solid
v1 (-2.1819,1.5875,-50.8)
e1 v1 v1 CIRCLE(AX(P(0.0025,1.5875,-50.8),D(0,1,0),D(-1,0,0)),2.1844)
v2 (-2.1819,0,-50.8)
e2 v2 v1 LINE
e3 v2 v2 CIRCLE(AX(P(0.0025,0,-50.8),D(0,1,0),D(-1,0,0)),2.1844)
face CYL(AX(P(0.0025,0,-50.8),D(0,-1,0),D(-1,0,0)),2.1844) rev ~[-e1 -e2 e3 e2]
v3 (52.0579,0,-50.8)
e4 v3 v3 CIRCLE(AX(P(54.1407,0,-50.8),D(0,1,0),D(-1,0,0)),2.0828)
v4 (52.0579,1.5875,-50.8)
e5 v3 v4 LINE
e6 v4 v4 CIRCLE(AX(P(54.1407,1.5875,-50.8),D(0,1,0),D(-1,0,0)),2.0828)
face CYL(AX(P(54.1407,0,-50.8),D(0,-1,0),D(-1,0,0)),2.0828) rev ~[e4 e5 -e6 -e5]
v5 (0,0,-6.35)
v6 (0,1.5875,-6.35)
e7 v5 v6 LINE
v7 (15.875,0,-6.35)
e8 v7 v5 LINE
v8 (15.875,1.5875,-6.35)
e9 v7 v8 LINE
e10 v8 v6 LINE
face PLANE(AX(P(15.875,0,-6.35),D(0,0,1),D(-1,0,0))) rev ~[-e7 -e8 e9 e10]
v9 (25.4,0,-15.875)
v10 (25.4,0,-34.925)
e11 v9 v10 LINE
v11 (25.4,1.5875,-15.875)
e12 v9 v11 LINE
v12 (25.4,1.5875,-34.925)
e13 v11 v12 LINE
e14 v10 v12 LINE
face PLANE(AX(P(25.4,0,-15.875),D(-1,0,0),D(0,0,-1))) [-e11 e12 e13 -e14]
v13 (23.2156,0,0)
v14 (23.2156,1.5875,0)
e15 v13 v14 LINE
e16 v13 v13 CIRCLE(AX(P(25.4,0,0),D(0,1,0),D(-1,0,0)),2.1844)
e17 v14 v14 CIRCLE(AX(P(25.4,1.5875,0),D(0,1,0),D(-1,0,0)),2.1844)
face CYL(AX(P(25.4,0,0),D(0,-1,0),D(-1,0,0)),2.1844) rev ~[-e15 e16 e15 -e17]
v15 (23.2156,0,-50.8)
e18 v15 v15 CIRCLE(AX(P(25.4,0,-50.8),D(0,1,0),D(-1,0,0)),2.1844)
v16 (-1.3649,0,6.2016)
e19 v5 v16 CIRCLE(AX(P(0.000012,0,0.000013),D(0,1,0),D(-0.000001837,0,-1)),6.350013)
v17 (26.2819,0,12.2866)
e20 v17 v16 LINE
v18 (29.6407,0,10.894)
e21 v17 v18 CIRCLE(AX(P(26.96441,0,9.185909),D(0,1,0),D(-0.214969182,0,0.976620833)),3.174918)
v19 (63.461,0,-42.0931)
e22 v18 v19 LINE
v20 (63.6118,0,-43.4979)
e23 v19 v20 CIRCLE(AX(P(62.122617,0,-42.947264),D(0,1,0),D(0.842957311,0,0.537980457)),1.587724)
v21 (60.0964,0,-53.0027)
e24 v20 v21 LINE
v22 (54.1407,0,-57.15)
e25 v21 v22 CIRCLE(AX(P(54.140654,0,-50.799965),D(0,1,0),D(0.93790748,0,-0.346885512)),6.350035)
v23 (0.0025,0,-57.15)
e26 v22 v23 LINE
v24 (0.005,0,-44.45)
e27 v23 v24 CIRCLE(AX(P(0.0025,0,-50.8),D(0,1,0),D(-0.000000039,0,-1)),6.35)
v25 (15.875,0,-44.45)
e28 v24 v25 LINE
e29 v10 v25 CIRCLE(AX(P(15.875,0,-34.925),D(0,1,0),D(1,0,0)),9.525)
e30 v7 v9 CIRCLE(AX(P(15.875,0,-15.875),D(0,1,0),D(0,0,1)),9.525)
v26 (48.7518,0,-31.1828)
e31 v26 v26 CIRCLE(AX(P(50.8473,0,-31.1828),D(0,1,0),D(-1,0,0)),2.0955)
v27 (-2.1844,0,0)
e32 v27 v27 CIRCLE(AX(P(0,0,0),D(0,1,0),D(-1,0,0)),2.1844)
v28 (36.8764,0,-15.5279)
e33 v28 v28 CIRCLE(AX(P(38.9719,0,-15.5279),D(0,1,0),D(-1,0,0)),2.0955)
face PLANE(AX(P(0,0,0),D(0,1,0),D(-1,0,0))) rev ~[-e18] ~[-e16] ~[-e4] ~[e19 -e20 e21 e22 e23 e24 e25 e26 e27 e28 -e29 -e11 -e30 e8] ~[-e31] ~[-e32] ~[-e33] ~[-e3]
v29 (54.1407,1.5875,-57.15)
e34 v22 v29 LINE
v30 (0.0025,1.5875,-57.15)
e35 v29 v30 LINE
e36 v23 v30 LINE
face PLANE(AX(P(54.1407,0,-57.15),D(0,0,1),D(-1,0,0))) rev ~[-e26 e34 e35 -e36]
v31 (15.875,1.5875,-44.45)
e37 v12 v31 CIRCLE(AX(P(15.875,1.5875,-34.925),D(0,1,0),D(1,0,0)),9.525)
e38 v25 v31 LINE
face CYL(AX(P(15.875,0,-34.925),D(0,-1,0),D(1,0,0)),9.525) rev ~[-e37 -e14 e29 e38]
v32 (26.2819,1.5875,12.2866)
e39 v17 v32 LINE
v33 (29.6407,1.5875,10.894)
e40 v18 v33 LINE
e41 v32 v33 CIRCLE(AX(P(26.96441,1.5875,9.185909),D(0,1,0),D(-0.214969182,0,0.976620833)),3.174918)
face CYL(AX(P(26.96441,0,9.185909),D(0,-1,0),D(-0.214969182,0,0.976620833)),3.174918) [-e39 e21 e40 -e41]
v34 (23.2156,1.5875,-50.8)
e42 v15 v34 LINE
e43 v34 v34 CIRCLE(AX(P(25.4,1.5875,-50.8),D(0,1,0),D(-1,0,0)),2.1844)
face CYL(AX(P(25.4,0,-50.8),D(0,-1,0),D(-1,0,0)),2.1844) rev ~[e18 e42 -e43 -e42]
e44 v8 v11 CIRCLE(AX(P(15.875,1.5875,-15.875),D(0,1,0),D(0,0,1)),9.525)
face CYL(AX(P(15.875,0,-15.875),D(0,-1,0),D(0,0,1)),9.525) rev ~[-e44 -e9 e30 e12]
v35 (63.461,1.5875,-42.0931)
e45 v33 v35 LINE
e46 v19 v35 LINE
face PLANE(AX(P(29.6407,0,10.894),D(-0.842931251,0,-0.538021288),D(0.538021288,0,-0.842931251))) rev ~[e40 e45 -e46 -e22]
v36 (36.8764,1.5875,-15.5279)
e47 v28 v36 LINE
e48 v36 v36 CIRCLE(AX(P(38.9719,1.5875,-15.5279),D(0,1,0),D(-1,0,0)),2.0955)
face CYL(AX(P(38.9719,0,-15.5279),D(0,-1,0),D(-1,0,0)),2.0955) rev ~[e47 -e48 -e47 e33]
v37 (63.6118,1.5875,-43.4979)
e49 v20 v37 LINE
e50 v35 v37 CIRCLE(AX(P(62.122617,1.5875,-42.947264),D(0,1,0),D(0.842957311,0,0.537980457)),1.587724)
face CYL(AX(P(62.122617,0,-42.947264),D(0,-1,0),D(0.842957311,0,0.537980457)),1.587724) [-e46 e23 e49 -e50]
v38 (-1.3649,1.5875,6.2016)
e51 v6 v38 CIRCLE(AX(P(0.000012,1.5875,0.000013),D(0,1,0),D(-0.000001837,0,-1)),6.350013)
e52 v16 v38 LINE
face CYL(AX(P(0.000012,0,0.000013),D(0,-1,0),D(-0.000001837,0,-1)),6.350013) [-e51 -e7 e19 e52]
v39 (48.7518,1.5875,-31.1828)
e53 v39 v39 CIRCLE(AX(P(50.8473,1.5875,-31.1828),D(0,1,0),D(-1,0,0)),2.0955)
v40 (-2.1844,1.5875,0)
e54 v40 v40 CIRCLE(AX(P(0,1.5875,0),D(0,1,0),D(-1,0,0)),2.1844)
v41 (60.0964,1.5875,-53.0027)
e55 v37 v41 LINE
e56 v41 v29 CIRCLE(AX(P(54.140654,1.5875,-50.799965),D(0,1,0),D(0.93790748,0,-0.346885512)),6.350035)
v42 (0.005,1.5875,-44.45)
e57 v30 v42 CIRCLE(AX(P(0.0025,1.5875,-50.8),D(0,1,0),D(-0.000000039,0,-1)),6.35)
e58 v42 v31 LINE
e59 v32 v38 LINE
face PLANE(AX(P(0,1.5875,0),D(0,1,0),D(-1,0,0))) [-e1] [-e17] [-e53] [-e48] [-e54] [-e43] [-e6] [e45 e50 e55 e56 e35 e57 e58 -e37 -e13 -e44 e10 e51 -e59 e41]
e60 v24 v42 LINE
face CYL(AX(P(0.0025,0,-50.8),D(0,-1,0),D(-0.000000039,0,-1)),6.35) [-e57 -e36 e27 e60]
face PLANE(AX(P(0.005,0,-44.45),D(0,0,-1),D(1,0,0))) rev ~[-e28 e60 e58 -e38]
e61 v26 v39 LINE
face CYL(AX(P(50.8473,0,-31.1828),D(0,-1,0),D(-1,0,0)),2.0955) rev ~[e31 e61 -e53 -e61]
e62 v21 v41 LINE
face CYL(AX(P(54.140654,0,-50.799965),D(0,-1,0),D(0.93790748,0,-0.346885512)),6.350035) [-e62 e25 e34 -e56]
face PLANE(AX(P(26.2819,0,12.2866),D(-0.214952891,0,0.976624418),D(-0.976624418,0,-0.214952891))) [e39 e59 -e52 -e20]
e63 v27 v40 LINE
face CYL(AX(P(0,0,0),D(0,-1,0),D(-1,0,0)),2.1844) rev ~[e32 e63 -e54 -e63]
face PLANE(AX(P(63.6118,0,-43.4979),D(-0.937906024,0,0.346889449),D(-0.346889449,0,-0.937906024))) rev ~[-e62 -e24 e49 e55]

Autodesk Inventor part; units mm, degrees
ref_plane "YZ Plane" through (0, 0, 0) normal (1, 0, 0) x (0, 1, 0)
ref_plane "XZ Plane" through (0, 0, 0) normal (0, 1, 0) x (-1, 0, 0)
ref_plane "XY Plane" through (0, 0, 0) normal (0, 0, 1) x (1, 0, 0)
sketch "main" plane through (0, 0, 0) normal (0, 0, 1) x (1, 0, 0)
  circle A0 centre (-18.8876, -16.6215) radius 2.0828
  arc A1 (-24.8433, -18.8241) -> (-18.8876, -22.9715) centre (-18.8876, -16.6215) ccw
  line L0 (5.6124, 45.0726) -> (-28.2078, -7.9145)
  circle A2 centre (9.8531, -16.6215) radius 2.1844
  line L1 (-18.8876, -22.9715) -> (35.2506, -22.9715)
  line L2 (9.8531, 18.3035) -> (9.8531, -0.7465)
  arc A3 (9.8531, -0.7465) -> (19.3781, -10.2715) centre (19.3781, -0.7465) ccw
  circle A4 centre (9.8531, 34.1785) radius 2.1844
  line L3 (35.2481, -10.2715) -> (19.3781, -10.2715)
  arc A5 (35.2506, -22.9715) -> (35.2481, -10.2715) centre (35.2506, -16.6215) ccw
  circle A6 centre (35.2531, 34.1785) radius 2.1844
  arc A7 (35.2531, 27.8285) -> (36.6181, 40.3801) centre (35.2531, 34.1785) ccw
  circle A8 centre (35.2506, -16.6215) radius 2.1844
  line L4 (-28.3586, -9.3193) -> (-24.8433, -18.8241)
  line L5 (19.3781, 27.8285) -> (35.2531, 27.8285)
  arc A9 (19.3781, 27.8285) -> (9.8531, 18.3035) centre (19.3781, 18.3035) ccw
  arc A10 (-28.2078, -7.9145) -> (-28.3586, -9.3193) centre (-26.8697, -8.7686) ccw
  line L6 (8.9712, 46.4651) -> (36.6181, 40.3801)
  arc A11 (8.9712, 46.4651) -> (5.6124, 45.0726) centre (8.2887, 43.3643) ccw
  circle A12 centre (-3.7188, 18.6506) radius 2.0955
  circle A13 centre (-15.5942, 2.9958) radius 2.0955
  point P0 (9.379, 13.4106)
  point P1 (9.8531, 27.8285)
  dimension "d0" = 4.1656
  dimension "d1" = 12.7
  dimension "d6" = 9.525
  dimension "d9" = 1.5875
  dimension "d17" = 3.175
  dimension "d18" = 50.8
  dimension "d19" = 7.8528
  dimension "d21" = 6.35
  dimension "d22" = 36.7228
  dimension "d23" = 50.8
  dimension "d24" = 25.4
  dimension "d28" = 4.191
  dimension "d29" = 4.191
sketch "Sketch1" plane through (0, 0, 0) normal (0, 1, 0) x (-1, 0, 0)
  circle A0 centre (-54.1407, -50.8) radius 2.0828
  arc A1 (-60.0964, -53.0027) -> (-54.1407, -57.15) centre (-54.1407, -50.8) ccw
  line L0 (-29.6407, 10.894) -> (-63.461, -42.0931)
  circle A2 centre (-25.4, -50.8) radius 2.1844
  line L1 (-54.1407, -57.15) -> (-0.0025, -57.15)
  line L2 (-25.4, -15.875) -> (-25.4, -34.925)
  arc A3 (-25.4, -34.925) -> (-15.875, -44.45) centre (-15.875, -34.925) ccw
  circle A4 centre (-25.4, 0) radius 2.1844
  line L3 (-0.005, -44.45) -> (-15.875, -44.45)
  arc A5 (-0.0025, -57.15) -> (-0.005, -44.45) centre (-0.0025, -50.8) ccw
  circle A6 centre (0, 0) radius 2.1844
  arc A7 (0, -6.35) -> (1.3649, 6.2016) centre (0, 0) ccw
  circle A8 centre (-0.0025, -50.8) radius 2.1844
  line L4 (-63.6118, -43.4979) -> (-60.0964, -53.0027)
  line L5 (-15.875, -6.35) -> (0, -6.35)
  arc A9 (-15.875, -6.35) -> (-25.4, -15.875) centre (-15.875, -15.875) ccw
  arc A10 (-63.461, -42.0931) -> (-63.6118, -43.4979) centre (-62.1228, -42.9472) ccw
  line L6 (-26.2819, 12.2866) -> (1.3649, 6.2016)
  arc A11 (-26.2819, 12.2866) -> (-29.6407, 10.894) centre (-26.9644, 9.1858) ccw
  circle A12 centre (-38.9719, -15.5279) radius 2.0955
  circle A13 centre (-50.8473, -31.1828) radius 2.0955
extrude "Extrusion1" add sketch "Sketch1" along normal blind 1.5875
properties part number "Funnel Gusset V2" material "Acetal Resin, White"
